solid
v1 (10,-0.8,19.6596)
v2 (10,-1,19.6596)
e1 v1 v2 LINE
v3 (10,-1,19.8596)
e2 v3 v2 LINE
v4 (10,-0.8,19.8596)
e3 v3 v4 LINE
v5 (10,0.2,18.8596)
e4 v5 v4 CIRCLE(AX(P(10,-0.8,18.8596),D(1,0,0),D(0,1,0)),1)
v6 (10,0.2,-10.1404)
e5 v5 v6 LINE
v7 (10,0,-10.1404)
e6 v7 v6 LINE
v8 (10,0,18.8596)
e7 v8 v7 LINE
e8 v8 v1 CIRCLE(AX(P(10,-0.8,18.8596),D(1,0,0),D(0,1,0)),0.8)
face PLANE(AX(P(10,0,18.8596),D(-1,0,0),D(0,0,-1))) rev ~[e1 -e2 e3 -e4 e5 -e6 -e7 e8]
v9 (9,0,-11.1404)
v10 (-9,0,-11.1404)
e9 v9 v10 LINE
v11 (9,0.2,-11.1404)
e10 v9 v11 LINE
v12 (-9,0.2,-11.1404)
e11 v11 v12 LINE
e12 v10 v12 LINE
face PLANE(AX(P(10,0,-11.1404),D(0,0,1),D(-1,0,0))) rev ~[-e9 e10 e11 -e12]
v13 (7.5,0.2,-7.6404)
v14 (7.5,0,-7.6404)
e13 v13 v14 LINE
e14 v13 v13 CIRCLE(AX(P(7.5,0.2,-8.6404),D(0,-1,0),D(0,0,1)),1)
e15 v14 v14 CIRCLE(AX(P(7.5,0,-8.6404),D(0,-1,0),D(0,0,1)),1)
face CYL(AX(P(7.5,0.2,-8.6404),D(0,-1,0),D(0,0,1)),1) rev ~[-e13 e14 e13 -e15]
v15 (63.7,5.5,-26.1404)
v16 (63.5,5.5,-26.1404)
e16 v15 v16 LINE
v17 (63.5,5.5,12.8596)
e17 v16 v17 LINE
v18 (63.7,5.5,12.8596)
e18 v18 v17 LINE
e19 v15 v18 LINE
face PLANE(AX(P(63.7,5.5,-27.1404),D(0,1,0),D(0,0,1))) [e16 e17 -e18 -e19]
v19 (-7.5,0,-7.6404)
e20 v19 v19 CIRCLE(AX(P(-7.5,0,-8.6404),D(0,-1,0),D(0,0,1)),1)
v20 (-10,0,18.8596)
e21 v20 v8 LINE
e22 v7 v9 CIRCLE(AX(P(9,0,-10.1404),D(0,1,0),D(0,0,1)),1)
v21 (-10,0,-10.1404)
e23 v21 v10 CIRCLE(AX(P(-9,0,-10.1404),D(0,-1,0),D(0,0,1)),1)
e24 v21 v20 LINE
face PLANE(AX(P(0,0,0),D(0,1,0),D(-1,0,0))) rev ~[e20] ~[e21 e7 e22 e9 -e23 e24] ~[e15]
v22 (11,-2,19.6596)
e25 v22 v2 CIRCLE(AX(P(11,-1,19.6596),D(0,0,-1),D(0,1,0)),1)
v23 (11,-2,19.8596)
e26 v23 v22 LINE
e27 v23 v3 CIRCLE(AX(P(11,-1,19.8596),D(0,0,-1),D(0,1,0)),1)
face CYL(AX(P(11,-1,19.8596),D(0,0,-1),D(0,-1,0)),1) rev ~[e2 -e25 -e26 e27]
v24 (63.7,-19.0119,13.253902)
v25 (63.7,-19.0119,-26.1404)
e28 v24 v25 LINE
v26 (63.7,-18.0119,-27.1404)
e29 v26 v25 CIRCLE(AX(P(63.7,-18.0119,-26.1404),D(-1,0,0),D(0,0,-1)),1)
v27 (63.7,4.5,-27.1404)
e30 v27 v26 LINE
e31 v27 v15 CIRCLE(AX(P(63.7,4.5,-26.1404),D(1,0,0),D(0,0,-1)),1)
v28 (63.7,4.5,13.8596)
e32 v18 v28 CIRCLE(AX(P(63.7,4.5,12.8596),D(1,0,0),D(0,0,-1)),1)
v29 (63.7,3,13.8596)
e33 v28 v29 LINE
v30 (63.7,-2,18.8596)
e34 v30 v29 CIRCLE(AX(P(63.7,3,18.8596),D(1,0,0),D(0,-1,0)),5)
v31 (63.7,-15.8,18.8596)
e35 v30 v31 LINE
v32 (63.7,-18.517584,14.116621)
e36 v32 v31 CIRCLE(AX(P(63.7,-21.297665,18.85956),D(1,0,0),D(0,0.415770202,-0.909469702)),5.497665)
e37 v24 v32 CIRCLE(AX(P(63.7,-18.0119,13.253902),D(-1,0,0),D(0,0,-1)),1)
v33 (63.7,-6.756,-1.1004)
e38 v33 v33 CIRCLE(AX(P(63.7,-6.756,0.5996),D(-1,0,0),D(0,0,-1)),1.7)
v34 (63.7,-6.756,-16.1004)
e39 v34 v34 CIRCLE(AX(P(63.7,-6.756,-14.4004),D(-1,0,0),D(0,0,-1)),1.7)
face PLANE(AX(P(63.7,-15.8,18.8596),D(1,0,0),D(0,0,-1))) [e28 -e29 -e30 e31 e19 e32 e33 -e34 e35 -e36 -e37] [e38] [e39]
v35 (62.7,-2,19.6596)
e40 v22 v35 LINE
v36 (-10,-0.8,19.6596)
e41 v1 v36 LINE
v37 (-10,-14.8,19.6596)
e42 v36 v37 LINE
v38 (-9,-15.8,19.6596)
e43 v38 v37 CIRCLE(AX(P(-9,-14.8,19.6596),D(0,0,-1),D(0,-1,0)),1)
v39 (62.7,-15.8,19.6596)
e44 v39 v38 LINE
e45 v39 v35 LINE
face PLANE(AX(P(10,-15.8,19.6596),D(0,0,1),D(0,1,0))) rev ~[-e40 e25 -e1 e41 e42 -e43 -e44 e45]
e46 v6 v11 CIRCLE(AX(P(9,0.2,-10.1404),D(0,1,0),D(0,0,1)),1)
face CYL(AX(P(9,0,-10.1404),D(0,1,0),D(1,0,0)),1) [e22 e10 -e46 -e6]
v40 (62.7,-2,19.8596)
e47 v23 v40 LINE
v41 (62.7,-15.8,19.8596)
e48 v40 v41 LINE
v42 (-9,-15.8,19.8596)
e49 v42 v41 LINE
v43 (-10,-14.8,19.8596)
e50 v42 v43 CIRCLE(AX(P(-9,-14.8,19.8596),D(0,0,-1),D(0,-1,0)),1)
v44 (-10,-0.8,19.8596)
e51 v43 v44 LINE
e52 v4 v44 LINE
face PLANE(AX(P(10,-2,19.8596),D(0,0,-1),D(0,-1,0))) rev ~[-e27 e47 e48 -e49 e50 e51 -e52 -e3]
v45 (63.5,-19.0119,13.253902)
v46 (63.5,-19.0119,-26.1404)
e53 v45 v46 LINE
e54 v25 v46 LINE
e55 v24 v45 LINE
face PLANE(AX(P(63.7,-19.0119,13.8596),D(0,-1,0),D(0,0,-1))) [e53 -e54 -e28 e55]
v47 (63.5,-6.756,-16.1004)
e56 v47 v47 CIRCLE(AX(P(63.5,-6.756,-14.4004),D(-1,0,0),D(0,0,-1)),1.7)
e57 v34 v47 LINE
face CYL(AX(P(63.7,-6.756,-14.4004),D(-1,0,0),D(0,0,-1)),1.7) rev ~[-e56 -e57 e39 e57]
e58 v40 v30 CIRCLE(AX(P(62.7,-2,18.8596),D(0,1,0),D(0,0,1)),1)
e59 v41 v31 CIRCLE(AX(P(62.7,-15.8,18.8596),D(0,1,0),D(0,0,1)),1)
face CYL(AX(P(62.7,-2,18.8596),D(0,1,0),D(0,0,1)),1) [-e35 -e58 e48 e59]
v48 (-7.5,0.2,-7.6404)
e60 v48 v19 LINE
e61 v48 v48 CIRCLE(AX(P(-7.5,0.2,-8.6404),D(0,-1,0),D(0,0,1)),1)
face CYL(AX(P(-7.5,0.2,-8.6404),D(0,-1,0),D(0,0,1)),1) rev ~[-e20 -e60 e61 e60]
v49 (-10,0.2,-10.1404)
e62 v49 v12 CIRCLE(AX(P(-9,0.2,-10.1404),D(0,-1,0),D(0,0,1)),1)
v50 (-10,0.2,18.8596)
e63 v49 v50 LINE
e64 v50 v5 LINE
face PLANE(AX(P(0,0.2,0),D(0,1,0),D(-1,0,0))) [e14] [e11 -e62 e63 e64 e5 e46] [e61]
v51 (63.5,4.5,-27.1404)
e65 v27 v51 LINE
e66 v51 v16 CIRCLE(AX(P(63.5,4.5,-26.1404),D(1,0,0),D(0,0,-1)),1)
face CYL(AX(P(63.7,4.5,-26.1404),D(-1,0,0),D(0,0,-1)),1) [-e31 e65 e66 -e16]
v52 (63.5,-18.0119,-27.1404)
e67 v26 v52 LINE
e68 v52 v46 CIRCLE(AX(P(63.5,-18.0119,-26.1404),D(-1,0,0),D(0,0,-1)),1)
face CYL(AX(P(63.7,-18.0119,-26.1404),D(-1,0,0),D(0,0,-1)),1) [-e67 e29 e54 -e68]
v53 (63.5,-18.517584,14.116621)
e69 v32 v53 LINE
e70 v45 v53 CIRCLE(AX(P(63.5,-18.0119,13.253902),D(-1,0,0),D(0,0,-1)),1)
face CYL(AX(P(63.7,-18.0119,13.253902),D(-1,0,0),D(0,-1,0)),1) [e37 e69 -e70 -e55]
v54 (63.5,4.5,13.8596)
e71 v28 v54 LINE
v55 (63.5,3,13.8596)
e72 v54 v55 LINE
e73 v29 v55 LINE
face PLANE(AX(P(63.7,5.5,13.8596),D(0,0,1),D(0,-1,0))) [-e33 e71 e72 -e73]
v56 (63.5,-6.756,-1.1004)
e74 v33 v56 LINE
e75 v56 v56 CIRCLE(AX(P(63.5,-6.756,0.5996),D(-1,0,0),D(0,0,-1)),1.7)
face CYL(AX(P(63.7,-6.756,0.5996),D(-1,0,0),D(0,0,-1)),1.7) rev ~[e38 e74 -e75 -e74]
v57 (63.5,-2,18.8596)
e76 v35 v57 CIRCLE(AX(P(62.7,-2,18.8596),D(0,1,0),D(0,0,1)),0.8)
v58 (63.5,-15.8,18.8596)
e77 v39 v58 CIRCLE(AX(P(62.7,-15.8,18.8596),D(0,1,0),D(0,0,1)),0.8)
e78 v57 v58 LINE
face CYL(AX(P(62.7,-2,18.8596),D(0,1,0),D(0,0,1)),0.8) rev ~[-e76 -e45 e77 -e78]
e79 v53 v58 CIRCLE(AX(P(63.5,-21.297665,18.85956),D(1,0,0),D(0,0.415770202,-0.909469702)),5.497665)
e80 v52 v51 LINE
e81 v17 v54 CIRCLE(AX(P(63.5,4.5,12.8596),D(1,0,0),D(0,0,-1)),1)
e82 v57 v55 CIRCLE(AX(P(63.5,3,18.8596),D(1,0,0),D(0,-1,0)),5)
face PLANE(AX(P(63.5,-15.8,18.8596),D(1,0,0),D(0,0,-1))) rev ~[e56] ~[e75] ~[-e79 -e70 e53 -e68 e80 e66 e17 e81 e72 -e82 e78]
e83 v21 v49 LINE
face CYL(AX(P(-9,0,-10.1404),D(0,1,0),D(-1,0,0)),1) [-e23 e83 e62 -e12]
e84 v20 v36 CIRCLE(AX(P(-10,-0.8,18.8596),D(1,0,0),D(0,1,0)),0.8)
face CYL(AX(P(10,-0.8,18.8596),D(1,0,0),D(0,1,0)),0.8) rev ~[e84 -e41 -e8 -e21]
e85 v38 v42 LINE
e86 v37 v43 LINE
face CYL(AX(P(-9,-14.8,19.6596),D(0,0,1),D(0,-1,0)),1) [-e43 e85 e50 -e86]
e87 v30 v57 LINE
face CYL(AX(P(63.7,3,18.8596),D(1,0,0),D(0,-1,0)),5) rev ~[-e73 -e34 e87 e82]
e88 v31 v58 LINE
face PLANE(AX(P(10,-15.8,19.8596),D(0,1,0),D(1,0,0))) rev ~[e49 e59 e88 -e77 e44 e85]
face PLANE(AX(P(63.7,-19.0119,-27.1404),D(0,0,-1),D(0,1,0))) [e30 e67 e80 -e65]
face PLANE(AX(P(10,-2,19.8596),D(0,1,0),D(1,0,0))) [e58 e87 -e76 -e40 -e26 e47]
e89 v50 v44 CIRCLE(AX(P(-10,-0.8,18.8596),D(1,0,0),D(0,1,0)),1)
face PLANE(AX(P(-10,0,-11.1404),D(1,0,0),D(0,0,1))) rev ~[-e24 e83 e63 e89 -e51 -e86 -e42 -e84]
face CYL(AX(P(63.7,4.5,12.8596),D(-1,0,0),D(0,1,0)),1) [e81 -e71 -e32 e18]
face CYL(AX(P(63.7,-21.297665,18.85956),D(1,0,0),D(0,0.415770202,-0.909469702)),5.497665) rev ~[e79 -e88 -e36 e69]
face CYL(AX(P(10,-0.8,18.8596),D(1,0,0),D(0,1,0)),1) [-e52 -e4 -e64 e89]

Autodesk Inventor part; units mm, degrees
ref_plane "YZ Plane" through (0, 0, 0) normal (1, 0, 0) x (0, 1, 0)
ref_plane "XZ Plane" through (0, 0, 0) normal (0, 1, 0) x (-1, 0, 0)
ref_plane "XY Plane" through (0, 0, 0) normal (0, 0, 1) x (1, 0, 0)
sketch "Sketch1" plane through (0, 0, 0) normal (0, 1, 0) x (-1, 0, 0)
  line L0 (-10, -11.1404) -> (10, -11.1404)
  line L1 (10, -11.1404) -> (10, 18.8596)
  line L2 (10, 18.8596) -> (-10, 18.8596)
  line L3 (-10, 18.8596) -> (-10, -11.1404)
  point P0 (0, 0)
  dimension "d0" = 20
  dimension "d1" = 10
  dimension "d2" = 30
extrude "Extrusion1" add sketch "Sketch1" along normal blind 0.2
sketch "Sketch2" plane through (10, 0, 18.8596) normal (1, 0, 0) x (0, 0, -1)
  line L0 (30, 0.2) -> (0, 0.2) projected
  arc A0 (0, 0.2) -> (-1, -0.8) centre (0, -0.8) ccw
  line L1 (0, -0.8) -> (-1, -0.8) construction
  line L2 (0, -0.8) -> (0, 0.2) construction
  arc A1 (0, 0) -> (-0.8, -0.8) centre (0, -0.8) ccw
  line L3 (0, 0) -> (30, 0) projected
  line L4 (-0.8, -0.8) -> (-0.8, -15.8)
  line L5 (-0.8, -15.8) -> (-1, -15.8)
  line L6 (-1, -15.8) -> (-1, -0.8)
  line L7 (0, 0) -> (0, 0.2) projected
  point P0 (18.8596, 0)
  dimension "d5" = 90
  dimension "d6" = 1
  dimension "d7" = 0.2
  dimension "d8" = 0.2
  dimension "d9" = 15
extrude "Extrusion2" add sketch "Sketch2" against normal up to surface (20 mm away)
sketch "Sketch3" plane through (10, -15.8, 19.8596) normal (1, 0, 0) x (0, 0, -1)
  arc A0 (1, 16) -> (0, 15) centre (1, 15) ccw projected
  arc A1 (1, 15.8) -> (0.2, 15) centre (1, 15) ccw projected
  line L0 (0, 13.8) -> (0.2, 13.8)
  line L1 (0, 15) -> (0, 0) projected
  line L2 (0.2, 0) -> (0.2, 15) projected
  line L3 (0, 0) -> (0.2, 0) projected
  point P0 (19.8596, 15.8)
  dimension "d19" = 1.2
extrude "Extrusion3" add sketch "Sketch3" along normal blind 52.7
sketch "Sketch4" plane through (10, -2, 19.8596) normal (0, 1, 0) x (1, 0, 0)
  line L0 (52.7, 0.2) -> (52.7, 0) projected
  arc A0 (52.7, 0) -> (53.7, 1) centre (52.7, 1) ccw
  line L1 (52.7, 1) -> (53.7, 1) construction
  line L2 (52.7, 1) -> (52.7, 0) construction
  arc A1 (52.7, 0.2) -> (53.5, 1) centre (52.7, 1) ccw
  line L3 (53.5, 1) -> (53.5, 47)
  line L4 (53.5, 47) -> (53.7, 47)
  line L5 (53.7, 47) -> (53.7, 1)
  point P0 (-10, 19.8596)
  dimension "d14" = 90
  dimension "d15" = 1
  dimension "d16" = 46
  dimension "d28" = 0.2
extrude "Extrusion4" add sketch "Sketch4" against normal up to surface (13.8 mm away)
sketch "Sketch5" plane through (63.7, -2, 18.8596) normal (1, 0, 0) x (0, 0, -1)
  line L0 (46, 0) -> (0, 0) projected
  line L1 (0, 0) -> (0, 0)
  line L2 (46, 0) -> (46, 7.5)
  line L3 (46, 7.5) -> (5, 7.5)
  line L4 (5, 7.5) -> (5, 5)
  arc A0 (0, 0) -> (5, 5) centre (0, 5) ccw
  point P0 (18.8596, 2)
  point P1 (5, 6.25)
  point P2 (30, 0)
  dimension "d20" = 7.5
  dimension "d21" = 5
  dimension "d22" = 5
extrude "Extrusion5" add sketch "Sketch5" against normal up to surface (0.2 mm away)
sketch "Sketch6" plane through (63.7, -15.8, 18.8596) normal (1, 0, 0) x (0, 0, -1)
  line L0 (46, 0) -> (46, 21.3) projected
  line L1 (46, 0) -> (5, 0)
  line L2 (5, -3.2119) -> (46, -3.2119)
  line L3 (46, -3.2119) -> (46, 0)
  line L4 (5, 21.3) -> (5, 18.8) projected
  line L5 (46, 0) -> (0, 0) projected
  arc A0 (5, -3.2119) -> (0, 0) centre (0, -5.4977) ccw
  line L6 (-1, 0) -> (0, 0) projected
  line L7 (0, 0) -> (5, 0)
  point P0 (18.8596, 15.8)
  point P1 (46.1737, 13.8)
extrude "Extrusion6" add sketch "Sketch6" against normal up to surface (0.2 mm away)
fillet "Fillet1" radius 1 8 edges at (63.6, 5.5, 13.8596) (63.6, 5.5, -27.1404) (63.6, -19.0119, -27.1404) (63.6, -19.0119, 13.8596) (10, 0.1, -11.1404) (-10, 0.1, -11.1404) (-10, -15.8, 19.7596) (10, -2, 19.7596)
sketch "Sketch7" plane through (0, 0.2, 0) normal (0, 1, 0) x (1, 0, 0)
  line L0 (-10, 10.1404) -> (-10, -18.8596) projected
  line L1 (9, 11.1404) -> (-9, 11.1404) projected
  line L2 (10, -18.8596) -> (10, 10.1404) projected
  point P0 (0, 0)
  point P1 (7.5, 8.6404)
  point P2 (-7.5, 8.6404)
  dimension "d29" = 2.5
  dimension "d30" = 2.5
  dimension "d31" = 2.5
hole "Hole1" at (7.5, 0.2, -8.6404) at (-7.5, 0.2, -8.6404) direction (0, -1, 0) diameter 2 depth 7.9 tip angle 118
sketch "Sketch8" plane through (63.7, -15.8, 18.8596) normal (1, 0, 0) x (0, 0, -1)
  line L0 (45, 21.3) -> (6, 21.3) projected
  line L1 (5.6057, -3.2119) -> (45, -3.2119) projected
  line L2 (46, -2.2119) -> (46, 20.3) projected
  point P0 (18.8596, 15.8)
  point P1 (18.26, 9.044)
  point P2 (33.26, 9.044)
  dimension "d39" = 24.5119
  dimension "d40" = 12.256
  dimension "d41" = 15
  dimension "d42" = 12.74
hole "Hole2" at (63.7, -6.756, 0.5996) at (63.7, -6.756, -14.4004) direction (-1, 0, 0) diameter 3.4 depth 7.9 tip angle 118 clearance for "Flat Head Machine Screw" size "M3" standard "Ansi Metric M Profile"
equation "\"d1\" = 0.5 * d0"
equation "\"d8\" = d7"
equation "\"d30\" = d29"
equation "\"d31\" = d29"
equation "\"d40\" = 0.5 * d39"
properties part number "Flex V1" material "Copper"
